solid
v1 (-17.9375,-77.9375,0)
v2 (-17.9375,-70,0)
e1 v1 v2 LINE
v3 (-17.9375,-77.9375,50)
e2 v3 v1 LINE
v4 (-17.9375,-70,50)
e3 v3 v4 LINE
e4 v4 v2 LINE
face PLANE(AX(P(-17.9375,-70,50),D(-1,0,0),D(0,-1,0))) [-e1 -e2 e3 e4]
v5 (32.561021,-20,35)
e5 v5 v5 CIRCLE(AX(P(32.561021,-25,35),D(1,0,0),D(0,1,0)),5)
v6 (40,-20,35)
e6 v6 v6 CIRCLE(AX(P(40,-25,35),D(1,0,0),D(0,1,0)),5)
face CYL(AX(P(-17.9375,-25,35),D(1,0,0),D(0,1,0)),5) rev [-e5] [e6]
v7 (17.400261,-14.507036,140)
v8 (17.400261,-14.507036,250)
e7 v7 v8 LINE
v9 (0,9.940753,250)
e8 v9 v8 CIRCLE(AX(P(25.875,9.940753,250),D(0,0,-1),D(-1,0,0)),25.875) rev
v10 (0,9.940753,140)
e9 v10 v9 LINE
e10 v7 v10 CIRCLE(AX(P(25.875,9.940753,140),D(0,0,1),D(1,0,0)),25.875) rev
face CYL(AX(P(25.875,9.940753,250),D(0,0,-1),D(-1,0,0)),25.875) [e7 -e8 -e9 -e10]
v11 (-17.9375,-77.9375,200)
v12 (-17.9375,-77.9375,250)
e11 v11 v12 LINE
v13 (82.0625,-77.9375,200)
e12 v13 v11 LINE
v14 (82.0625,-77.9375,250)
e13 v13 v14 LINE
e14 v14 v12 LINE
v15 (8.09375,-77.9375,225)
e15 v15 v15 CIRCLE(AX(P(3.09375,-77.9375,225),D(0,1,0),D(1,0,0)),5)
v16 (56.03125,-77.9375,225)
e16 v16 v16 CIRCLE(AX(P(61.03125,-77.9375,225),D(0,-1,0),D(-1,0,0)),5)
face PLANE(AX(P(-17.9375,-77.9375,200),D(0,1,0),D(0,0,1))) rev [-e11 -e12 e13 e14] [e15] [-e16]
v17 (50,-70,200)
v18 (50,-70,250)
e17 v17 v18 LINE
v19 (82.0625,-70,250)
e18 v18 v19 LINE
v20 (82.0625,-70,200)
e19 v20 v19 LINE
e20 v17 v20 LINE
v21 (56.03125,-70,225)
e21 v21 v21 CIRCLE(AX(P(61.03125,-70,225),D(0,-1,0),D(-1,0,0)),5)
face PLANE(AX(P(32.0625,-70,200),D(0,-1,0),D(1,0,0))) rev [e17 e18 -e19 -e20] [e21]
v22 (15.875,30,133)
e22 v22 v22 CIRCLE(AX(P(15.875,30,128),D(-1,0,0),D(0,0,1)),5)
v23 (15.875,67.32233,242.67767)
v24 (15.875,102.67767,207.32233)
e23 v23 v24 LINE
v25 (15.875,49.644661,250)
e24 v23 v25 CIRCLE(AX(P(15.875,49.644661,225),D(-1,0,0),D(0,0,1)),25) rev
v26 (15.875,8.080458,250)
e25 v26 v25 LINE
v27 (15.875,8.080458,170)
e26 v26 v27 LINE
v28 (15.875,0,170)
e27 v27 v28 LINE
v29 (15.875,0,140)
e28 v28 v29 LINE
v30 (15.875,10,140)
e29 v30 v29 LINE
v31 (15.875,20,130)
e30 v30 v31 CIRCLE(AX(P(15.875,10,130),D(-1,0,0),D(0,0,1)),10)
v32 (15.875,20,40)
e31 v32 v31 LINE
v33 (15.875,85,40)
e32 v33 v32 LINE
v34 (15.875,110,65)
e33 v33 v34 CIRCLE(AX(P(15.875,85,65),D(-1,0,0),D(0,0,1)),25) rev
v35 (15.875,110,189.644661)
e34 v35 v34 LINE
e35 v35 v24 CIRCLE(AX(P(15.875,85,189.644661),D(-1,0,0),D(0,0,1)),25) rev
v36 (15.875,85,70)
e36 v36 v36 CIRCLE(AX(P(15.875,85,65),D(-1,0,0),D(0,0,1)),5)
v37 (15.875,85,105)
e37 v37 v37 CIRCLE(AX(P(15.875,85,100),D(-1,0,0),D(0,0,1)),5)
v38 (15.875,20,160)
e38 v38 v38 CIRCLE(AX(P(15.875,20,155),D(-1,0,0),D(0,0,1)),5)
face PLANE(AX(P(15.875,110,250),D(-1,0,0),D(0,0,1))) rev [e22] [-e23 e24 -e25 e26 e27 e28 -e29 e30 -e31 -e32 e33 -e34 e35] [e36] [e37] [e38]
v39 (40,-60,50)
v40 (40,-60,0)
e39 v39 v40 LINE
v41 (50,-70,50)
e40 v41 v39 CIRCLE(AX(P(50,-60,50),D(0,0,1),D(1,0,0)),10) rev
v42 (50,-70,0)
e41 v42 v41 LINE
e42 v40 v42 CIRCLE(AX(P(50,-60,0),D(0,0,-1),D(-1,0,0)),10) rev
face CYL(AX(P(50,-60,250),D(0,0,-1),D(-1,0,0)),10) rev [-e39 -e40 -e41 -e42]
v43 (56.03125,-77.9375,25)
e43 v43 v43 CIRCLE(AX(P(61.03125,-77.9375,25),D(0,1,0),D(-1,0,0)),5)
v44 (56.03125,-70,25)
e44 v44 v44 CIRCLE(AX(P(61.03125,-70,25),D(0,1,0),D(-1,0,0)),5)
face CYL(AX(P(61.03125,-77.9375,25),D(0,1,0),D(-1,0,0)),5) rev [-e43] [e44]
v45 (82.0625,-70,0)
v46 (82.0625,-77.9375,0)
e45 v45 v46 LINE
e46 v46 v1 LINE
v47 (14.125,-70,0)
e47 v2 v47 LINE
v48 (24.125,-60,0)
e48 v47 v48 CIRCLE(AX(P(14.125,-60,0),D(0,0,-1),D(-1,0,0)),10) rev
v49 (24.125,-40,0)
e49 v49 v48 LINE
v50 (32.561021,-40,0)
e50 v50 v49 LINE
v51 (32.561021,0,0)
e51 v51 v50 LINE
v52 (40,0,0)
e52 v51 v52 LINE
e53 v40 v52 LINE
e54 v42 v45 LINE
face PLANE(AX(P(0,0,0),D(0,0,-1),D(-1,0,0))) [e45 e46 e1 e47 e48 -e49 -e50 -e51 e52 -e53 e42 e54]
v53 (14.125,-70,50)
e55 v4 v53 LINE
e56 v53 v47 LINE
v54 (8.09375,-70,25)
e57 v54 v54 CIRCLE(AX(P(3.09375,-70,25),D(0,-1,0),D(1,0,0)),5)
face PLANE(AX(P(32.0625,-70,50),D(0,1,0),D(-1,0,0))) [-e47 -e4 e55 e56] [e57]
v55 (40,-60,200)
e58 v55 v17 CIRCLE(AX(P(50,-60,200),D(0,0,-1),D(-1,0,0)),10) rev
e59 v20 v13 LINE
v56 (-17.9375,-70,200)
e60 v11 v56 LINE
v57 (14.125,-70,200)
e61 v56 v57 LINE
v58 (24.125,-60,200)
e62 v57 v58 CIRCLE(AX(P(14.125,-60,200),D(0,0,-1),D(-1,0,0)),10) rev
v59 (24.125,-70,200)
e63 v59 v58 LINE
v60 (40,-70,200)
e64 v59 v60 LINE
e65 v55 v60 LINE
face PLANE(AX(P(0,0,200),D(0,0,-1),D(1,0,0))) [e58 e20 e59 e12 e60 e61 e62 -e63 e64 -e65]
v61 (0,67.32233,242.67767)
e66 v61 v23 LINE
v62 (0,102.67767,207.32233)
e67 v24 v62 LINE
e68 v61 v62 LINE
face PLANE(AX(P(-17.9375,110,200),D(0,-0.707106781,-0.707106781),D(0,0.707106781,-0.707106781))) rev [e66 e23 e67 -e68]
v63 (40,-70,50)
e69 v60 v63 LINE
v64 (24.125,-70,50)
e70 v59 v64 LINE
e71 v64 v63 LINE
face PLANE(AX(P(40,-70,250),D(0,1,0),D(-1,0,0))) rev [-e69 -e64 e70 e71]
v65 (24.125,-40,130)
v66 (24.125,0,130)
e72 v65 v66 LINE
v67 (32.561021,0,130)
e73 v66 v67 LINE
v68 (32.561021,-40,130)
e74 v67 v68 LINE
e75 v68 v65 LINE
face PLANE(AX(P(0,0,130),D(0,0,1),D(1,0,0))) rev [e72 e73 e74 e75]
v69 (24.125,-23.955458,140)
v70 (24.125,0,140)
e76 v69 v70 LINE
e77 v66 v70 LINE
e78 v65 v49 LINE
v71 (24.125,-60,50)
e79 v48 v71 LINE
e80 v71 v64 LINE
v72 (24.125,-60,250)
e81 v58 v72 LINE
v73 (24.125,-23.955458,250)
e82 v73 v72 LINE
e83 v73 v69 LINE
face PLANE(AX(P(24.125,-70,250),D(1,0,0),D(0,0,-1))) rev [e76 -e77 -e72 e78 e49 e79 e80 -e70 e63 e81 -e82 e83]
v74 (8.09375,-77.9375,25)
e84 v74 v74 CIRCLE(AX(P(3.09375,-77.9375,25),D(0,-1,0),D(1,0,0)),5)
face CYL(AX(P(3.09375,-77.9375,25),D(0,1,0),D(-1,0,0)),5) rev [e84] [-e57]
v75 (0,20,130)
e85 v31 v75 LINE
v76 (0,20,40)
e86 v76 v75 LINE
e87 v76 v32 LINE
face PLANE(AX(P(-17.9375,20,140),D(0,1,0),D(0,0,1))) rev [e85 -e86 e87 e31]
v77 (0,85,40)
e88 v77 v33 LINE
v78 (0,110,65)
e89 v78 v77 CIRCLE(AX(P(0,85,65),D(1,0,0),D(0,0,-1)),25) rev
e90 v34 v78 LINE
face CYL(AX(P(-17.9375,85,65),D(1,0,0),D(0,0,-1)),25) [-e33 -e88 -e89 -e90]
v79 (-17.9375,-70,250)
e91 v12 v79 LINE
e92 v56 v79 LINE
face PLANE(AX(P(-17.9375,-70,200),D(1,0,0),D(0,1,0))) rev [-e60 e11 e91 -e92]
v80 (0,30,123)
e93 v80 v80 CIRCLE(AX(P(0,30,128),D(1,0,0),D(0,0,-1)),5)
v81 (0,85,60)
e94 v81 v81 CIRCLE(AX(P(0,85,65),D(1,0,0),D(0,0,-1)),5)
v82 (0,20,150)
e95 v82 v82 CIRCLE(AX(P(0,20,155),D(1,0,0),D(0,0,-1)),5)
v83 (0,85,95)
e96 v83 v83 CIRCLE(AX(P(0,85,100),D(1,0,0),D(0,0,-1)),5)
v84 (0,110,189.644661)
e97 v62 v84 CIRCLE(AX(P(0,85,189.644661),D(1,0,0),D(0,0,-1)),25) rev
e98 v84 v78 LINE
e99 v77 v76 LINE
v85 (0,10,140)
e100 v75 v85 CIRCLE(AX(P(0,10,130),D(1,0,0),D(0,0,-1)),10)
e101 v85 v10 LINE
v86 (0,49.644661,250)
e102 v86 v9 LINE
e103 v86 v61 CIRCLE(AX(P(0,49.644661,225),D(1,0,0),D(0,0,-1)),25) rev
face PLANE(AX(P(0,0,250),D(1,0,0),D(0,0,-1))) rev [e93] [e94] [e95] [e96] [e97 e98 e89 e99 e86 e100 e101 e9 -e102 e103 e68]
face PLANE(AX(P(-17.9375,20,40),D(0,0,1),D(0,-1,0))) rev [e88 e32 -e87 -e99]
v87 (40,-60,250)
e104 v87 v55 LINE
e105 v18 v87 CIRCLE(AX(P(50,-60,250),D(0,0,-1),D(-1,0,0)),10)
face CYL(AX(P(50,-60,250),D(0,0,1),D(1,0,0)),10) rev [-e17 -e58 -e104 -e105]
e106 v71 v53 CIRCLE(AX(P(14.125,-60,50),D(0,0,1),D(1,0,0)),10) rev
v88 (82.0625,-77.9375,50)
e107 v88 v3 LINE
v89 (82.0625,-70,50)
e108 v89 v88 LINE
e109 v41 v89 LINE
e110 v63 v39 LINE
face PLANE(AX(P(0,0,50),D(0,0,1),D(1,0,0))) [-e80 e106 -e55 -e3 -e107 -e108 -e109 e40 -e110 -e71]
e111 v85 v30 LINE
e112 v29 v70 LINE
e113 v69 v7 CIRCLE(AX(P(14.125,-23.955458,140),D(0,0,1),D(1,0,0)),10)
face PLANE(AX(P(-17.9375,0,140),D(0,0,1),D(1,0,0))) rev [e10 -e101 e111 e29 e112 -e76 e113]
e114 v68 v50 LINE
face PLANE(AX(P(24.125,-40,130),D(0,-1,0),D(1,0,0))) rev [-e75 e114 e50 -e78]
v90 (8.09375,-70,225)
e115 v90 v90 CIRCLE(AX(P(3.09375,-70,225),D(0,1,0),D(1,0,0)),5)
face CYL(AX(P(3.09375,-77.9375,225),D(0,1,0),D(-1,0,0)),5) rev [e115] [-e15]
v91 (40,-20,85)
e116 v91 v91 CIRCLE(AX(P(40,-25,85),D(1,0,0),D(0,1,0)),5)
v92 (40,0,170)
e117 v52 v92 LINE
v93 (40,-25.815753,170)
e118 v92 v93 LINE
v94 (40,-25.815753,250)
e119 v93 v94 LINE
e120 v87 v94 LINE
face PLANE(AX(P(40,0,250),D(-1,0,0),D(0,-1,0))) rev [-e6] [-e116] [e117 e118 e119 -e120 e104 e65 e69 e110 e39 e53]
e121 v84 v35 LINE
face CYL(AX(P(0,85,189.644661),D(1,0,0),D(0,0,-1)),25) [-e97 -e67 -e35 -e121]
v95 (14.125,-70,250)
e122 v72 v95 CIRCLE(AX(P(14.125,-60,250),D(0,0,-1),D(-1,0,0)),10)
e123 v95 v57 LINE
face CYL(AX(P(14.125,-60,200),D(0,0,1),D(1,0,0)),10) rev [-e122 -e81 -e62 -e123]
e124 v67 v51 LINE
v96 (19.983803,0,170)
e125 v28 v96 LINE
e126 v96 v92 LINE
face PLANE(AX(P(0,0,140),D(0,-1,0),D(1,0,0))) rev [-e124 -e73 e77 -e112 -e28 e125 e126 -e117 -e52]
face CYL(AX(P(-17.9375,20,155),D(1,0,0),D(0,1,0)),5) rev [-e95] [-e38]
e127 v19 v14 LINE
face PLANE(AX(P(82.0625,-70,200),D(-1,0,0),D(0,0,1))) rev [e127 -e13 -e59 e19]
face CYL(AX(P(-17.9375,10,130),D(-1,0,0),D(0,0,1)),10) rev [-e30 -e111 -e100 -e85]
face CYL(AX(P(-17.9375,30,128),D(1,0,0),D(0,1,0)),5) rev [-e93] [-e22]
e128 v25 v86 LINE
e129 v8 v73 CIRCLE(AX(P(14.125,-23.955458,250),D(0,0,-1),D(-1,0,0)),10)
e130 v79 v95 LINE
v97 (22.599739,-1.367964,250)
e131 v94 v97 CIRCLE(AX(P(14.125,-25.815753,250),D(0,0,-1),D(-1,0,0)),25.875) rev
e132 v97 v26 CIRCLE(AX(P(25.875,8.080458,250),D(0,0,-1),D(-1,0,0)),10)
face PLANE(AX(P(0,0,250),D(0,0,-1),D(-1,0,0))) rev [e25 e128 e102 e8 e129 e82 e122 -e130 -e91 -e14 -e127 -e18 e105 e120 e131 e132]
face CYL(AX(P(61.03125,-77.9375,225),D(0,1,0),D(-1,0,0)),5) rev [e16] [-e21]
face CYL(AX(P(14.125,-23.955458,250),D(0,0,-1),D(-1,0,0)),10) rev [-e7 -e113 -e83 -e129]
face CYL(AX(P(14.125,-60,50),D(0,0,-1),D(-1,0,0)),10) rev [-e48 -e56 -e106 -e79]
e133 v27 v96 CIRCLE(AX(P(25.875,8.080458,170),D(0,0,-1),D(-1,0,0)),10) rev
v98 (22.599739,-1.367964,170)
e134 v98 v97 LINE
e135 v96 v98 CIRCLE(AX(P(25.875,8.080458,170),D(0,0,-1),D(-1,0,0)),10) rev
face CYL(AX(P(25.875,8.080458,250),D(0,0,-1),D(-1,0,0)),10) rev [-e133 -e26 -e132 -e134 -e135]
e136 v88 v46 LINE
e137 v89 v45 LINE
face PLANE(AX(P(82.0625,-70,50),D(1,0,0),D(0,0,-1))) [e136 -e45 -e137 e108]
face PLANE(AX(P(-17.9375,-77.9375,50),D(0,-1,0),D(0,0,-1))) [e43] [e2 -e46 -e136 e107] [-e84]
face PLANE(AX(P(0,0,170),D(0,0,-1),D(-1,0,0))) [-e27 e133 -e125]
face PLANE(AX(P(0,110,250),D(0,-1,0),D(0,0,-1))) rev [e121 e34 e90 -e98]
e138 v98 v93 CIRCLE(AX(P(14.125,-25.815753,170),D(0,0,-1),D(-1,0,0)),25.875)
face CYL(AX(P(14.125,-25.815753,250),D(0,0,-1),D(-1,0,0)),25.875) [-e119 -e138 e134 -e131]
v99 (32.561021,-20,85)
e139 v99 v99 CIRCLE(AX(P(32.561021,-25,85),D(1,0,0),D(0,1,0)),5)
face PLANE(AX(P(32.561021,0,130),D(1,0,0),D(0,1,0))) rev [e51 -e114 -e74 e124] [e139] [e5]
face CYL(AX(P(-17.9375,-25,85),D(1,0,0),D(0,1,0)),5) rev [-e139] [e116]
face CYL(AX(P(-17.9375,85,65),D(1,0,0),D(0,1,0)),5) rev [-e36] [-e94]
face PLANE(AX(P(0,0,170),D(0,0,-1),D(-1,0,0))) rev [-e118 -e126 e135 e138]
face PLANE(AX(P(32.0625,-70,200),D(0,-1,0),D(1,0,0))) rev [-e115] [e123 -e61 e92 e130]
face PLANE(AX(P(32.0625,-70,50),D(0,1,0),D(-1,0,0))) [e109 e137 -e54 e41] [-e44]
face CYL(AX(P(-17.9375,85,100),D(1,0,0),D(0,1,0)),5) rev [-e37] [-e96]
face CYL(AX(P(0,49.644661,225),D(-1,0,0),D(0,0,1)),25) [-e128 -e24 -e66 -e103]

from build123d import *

# Parameters (mm, degrees)
BOSS_EXTRUDE1_DEPTH     = 250
BOSS_EXTRUDE2_DEPTH     = 50
SKETCH3_R               = 5
CUT_EXTRUDE1_DEPTH      = 319.801276513
FILLET1_R               = 10
MIRROR2_COPY_1_SKETCH_R = 5
MIRROR2_COPY_1_DEPTH    = 319.801276513
FILLET1_OF_MIRROR2_R    = 10
CUT_EXTRUDE2_DEPTH      = 282.035202699
FILLET2_R               = 25
CUT_EXTRUDE3_DEPTH      = 282.035202699
FILLET3_R               = 25
SKETCH6_R               = 5
CUT_EXTRUDE4_DEPTH      = 280.207367213
CUT_EXTRUDE5_DEPTH      = 170
FILLET4_R               = 10
FILLET5_R               = 25.875
FILLET6_R               = 10
BOSS_EXTRUDE3_DEPTH     = 30
SKETCH9_W               = 15.875
SKETCH9_H               = 40
BOSS_EXTRUDE4_DEPTH     = 140
FILLET7_R               = 25.875
FILLET8_R               = 10
SKETCH10_W              = 8.436021397
SKETCH10_H              = 40
CUT_EXTRUDE6_DEPTH      = 130
SKETCH11_R              = 5
CUT_EXTRUDE7_DEPTH      = 280.207367213


with BuildPart() as part:
    # Sketch1 → Boss-Extrude1 (new body)
    with BuildSketch(Plane.XY):
        Polygon((0, 0), (0, 110), (15.875, 110), (15.875, 0), (40, 0), (40, -70), (24.125, -70), (24.125, -15.875), (0, -15.875), align=None)
    extrude(amount=BOSS_EXTRUDE1_DEPTH)

    # Sketch2 → Boss-Extrude2 (add)
    with BuildSketch(Plane(origin=(0, 0, 0), x_dir=(-1, 0, 0), z_dir=(0, 0, -1))):
        Polygon((-32.0625, -70), (-82.0625, -70), (-82.0625, -77.9375), (17.9375, -77.9375), (17.9375, -70), align=None)
    boss_extrude2 = extrude(amount=-BOSS_EXTRUDE2_DEPTH)

    # Sketch3 → Cut-Extrude1 (cut, through all)
    with BuildSketch(Plane(origin=(0, -70, 0), x_dir=(1, 0, 0), z_dir=(0, 1, 0))):
        with Locations(Location((61.03125, -25, 0), (0, 0, 180))):
            Circle(SKETCH3_R)
    cut_extrude1 = extrude(amount=-CUT_EXTRUDE1_DEPTH, mode=Mode.SUBTRACT)

    # Mirror1: Cut-Extrude1 across plane
    add(cut_extrude1.mirror(Plane(origin=(32.0625, 0, 0), x_dir=(0, 0, 1), z_dir=(1, 0, 0))), mode=Mode.SUBTRACT)

    # Fillet1
    fillet1_edges = [part.edges().sort_by_distance(p)[0] for p in [
        (40, -70, 25),
        (24.125, -70, 25),
    ]]
    fillet(fillet1_edges, radius=FILLET1_R)

    # Mirror2: Boss-Extrude2, Cut-Extrude1 across plane
    add(boss_extrude2.mirror(Plane(origin=(0, 0, 125), x_dir=(1, 0, 0), z_dir=(0, 0, -1))))
    add(cut_extrude1.mirror(Plane(origin=(0, 0, 125), x_dir=(1, 0, 0), z_dir=(0, 0, -1))), mode=Mode.SUBTRACT)

    # Mirror2 copy 1 sketch → Mirror2 copy 1 (cut, through all)
    with BuildSketch(Plane(origin=(64.125, -70, 250), x_dir=(-1, 0, 0), z_dir=(0, 1, 0))):
        with Locations(Location((61.03125, -25, 0), (0, 0, 180))):
            Circle(MIRROR2_COPY_1_SKETCH_R)
    extrude(amount=-MIRROR2_COPY_1_DEPTH, mode=Mode.SUBTRACT)

    # Fillet1 of Mirror2
    fillet1_of_mirror2_edges = [part.edges().sort_by_distance(p)[0] for p in [
        (40, -70, 225),
        (24.125, -70, 225),
    ]]
    fillet(fillet1_of_mirror2_edges, radius=FILLET1_OF_MIRROR2_R)

    # Sketch4 → Cut-Extrude2 (cut, through all)
    with BuildSketch(Plane(origin=(15.875, 0, 0), x_dir=(0, 0, -1), z_dir=(1, 0, 0))):
        Polygon((0, 0), (-140, 0), (-140, 20), (-40, 20), (-40, 110), (0, 110), align=None)
    extrude(amount=-CUT_EXTRUDE2_DEPTH, mode=Mode.SUBTRACT)

    # Fillet2
    fillet2_edges = [part.edges().sort_by_distance(p)[0] for p in [
        (7.9375, 110, 40),
    ]]
    fillet(fillet2_edges, radius=FILLET2_R)

    # Sketch5 → Cut-Extrude3 (cut, through all)
    with BuildSketch(Plane(origin=(15.875, 0, 0), x_dir=(0, 0, -1), z_dir=(1, 0, 0))):
        Polygon((-250, 60), (-250, 110), (-200, 110), align=None)
    extrude(amount=-CUT_EXTRUDE3_DEPTH, mode=Mode.SUBTRACT)

    # Fillet3
    fillet3_edges = [part.edges().sort_by_distance(p)[0] for p in [
        (7.9375, 60, 250),
        (7.9375, 110, 200),
    ]]
    fillet(fillet3_edges, radius=FILLET3_R)

    # Sketch6 → Cut-Extrude4 (cut, through all)
    with BuildSketch(Plane(origin=(40, 0, 0), x_dir=(0, 0, -1), z_dir=(1, 0, 0))):
        with Locations((-65, 85)):
            Circle(SKETCH6_R)
        with Locations((-100, 85)):
            Circle(SKETCH6_R)
        with Locations((-128, 30)):
            Circle(SKETCH6_R)
        with Locations((-155, 20)):
            Circle(SKETCH6_R)
        with Locations(Location((-35, -25, 0), (0, 0, 90))):
            Circle(SKETCH6_R)
        with Locations(Location((-85, -25, 0), (0, 0, 90))):
            Circle(SKETCH6_R)
    extrude(amount=-CUT_EXTRUDE4_DEPTH, mode=Mode.SUBTRACT)

    # Sketch7 → Cut-Extrude5 (cut)
    with BuildSketch(Plane(origin=(0, 0, 0), x_dir=(-1, 0, 0), z_dir=(0, 0, -1))):
        Polygon((0, 0), (-40, 0), (-40, -40), (-24.125, -40), (-24.125, -15.875), (0, -15.875), align=None)
    extrude(amount=-CUT_EXTRUDE5_DEPTH, mode=Mode.SUBTRACT)

    # Fillet4
    fillet4_edges = [part.edges().sort_by_distance(p)[0] for p in [
        (7.9375, 20, 140),
    ]]
    fillet(fillet4_edges, radius=FILLET4_R)

    # Fillet5
    # the kernel refuses this fillet: 25.875 mm, written as the material it takes off along each edge
    with BuildSketch(Plane(origin=(40, 0, 105.460616433), x_dir=(-1, 0, 0), z_dir=(0, 0, 1))) as fillet5_piece_1:
        with BuildLine():
            CenterArc((25.875, 25.815753427), FILLET5_R, 180, 86.121962796)
            Line((0, 25.815753427), (-0.5175, 25.815753427))
            Line((-0.5175, 25.815753427), (-0.5175, 0))
            Line((-0.5175, 0), (0, -0.5175))
            ThreePointArc((0, -0.5175), (12.0625, -0.5175), (24.09, -0.516315069))
            Line((24.09, -0.516315069), (24.125, 0))
        make_face()
    extrude(amount=209.078767135, mode=Mode.SUBTRACT)

    # Fillet6
    fillet6_edges = [part.edges().sort_by_distance(p)[0] for p in [
        (15.875, 0, 210),
    ]]
    fillet(fillet6_edges, radius=FILLET6_R)

    # Sketch8 → Boss-Extrude3 (add)
    with BuildSketch(Plane(origin=(0, 0, 170), x_dir=(-1, 0, 0), z_dir=(0, 0, -1))):
        Polygon((-40, -40), (-24.125, -40), (-24.125, -15.875), (0, -15.875), (0, 0), (-40, 0), align=None)
    extrude(amount=BOSS_EXTRUDE3_DEPTH)

    # Sketch9 → Boss-Extrude4 (add)
    with BuildSketch(Plane(origin=(0, 0, 140), x_dir=(-1, 0, 0), z_dir=(0, 0, -1))):
        with Locations((-32.0625, -20)):
            Rectangle(SKETCH9_W, SKETCH9_H)
    extrude(amount=BOSS_EXTRUDE4_DEPTH)

    # Fillet7
    # the kernel refuses this fillet: 25.875 mm, written as the material it takes off along each edge
    with BuildSketch(Plane(origin=(0, -15.875, 75.460616433), x_dir=(1, 0, 0), z_dir=(0, 0, 1))) as fillet7_piece_1:
        with BuildLine():
            CenterArc((25.875, 25.815753427), FILLET7_R, 180, 86.121962796)
            Line((0, 25.815753427), (-0.5175, 25.815753427))
            Line((-0.5175, 25.815753427), (-0.5175, 0))
            Line((-0.5175, 0), (0, -0.5175))
            ThreePointArc((0, -0.5175), (12.0625, -0.5175), (24.09, -0.516315069))
            Line((24.09, -0.516315069), (24.125, 0))
        make_face()
    extrude(amount=239.078767135, mode=Mode.SUBTRACT)

    # Fillet8
    # the kernel refuses this fillet: 10 mm, written as the material it adds along each edge
    with BuildSketch(Plane(origin=(24.125, -15.875, 140), x_dir=(0, -1, 0), z_dir=(0, 0, 1))) as fillet8_piece_1:
        with BuildLine():
            CenterArc((8.080457645, -10), FILLET8_R, 90, 70.881309601)
            ThreePointArc((-1.36796356, -6.724738676), (-0.46005439, -3.407921221), (0, 0))
            Line((0, 0), (8.080457645, 0))
        make_face()
    extrude(amount=110)

    # Sketch10 → Cut-Extrude6 (cut)
    with BuildSketch(Plane(origin=(0, 0, 0), x_dir=(-1, 0, 0), z_dir=(0, 0, -1))):
        with Locations((-28.343010699, -20)):
            Rectangle(SKETCH10_W, SKETCH10_H)
    extrude(amount=-CUT_EXTRUDE6_DEPTH, mode=Mode.SUBTRACT)

    # Sketch11 → Cut-Extrude7 (cut, through all)
    with BuildSketch(Plane(origin=(40, 0, 0), x_dir=(0, 0, -1), z_dir=(1, 0, 0))):
        with Locations(Location((-35, -25, 0), (0, 0, 90))):
            Circle(SKETCH11_R)
        with Locations(Location((-85, -25, 0), (0, 0, 90))):
            Circle(SKETCH11_R)
    extrude(amount=-CUT_EXTRUDE7_DEPTH, mode=Mode.SUBTRACT)


solid = part.part
